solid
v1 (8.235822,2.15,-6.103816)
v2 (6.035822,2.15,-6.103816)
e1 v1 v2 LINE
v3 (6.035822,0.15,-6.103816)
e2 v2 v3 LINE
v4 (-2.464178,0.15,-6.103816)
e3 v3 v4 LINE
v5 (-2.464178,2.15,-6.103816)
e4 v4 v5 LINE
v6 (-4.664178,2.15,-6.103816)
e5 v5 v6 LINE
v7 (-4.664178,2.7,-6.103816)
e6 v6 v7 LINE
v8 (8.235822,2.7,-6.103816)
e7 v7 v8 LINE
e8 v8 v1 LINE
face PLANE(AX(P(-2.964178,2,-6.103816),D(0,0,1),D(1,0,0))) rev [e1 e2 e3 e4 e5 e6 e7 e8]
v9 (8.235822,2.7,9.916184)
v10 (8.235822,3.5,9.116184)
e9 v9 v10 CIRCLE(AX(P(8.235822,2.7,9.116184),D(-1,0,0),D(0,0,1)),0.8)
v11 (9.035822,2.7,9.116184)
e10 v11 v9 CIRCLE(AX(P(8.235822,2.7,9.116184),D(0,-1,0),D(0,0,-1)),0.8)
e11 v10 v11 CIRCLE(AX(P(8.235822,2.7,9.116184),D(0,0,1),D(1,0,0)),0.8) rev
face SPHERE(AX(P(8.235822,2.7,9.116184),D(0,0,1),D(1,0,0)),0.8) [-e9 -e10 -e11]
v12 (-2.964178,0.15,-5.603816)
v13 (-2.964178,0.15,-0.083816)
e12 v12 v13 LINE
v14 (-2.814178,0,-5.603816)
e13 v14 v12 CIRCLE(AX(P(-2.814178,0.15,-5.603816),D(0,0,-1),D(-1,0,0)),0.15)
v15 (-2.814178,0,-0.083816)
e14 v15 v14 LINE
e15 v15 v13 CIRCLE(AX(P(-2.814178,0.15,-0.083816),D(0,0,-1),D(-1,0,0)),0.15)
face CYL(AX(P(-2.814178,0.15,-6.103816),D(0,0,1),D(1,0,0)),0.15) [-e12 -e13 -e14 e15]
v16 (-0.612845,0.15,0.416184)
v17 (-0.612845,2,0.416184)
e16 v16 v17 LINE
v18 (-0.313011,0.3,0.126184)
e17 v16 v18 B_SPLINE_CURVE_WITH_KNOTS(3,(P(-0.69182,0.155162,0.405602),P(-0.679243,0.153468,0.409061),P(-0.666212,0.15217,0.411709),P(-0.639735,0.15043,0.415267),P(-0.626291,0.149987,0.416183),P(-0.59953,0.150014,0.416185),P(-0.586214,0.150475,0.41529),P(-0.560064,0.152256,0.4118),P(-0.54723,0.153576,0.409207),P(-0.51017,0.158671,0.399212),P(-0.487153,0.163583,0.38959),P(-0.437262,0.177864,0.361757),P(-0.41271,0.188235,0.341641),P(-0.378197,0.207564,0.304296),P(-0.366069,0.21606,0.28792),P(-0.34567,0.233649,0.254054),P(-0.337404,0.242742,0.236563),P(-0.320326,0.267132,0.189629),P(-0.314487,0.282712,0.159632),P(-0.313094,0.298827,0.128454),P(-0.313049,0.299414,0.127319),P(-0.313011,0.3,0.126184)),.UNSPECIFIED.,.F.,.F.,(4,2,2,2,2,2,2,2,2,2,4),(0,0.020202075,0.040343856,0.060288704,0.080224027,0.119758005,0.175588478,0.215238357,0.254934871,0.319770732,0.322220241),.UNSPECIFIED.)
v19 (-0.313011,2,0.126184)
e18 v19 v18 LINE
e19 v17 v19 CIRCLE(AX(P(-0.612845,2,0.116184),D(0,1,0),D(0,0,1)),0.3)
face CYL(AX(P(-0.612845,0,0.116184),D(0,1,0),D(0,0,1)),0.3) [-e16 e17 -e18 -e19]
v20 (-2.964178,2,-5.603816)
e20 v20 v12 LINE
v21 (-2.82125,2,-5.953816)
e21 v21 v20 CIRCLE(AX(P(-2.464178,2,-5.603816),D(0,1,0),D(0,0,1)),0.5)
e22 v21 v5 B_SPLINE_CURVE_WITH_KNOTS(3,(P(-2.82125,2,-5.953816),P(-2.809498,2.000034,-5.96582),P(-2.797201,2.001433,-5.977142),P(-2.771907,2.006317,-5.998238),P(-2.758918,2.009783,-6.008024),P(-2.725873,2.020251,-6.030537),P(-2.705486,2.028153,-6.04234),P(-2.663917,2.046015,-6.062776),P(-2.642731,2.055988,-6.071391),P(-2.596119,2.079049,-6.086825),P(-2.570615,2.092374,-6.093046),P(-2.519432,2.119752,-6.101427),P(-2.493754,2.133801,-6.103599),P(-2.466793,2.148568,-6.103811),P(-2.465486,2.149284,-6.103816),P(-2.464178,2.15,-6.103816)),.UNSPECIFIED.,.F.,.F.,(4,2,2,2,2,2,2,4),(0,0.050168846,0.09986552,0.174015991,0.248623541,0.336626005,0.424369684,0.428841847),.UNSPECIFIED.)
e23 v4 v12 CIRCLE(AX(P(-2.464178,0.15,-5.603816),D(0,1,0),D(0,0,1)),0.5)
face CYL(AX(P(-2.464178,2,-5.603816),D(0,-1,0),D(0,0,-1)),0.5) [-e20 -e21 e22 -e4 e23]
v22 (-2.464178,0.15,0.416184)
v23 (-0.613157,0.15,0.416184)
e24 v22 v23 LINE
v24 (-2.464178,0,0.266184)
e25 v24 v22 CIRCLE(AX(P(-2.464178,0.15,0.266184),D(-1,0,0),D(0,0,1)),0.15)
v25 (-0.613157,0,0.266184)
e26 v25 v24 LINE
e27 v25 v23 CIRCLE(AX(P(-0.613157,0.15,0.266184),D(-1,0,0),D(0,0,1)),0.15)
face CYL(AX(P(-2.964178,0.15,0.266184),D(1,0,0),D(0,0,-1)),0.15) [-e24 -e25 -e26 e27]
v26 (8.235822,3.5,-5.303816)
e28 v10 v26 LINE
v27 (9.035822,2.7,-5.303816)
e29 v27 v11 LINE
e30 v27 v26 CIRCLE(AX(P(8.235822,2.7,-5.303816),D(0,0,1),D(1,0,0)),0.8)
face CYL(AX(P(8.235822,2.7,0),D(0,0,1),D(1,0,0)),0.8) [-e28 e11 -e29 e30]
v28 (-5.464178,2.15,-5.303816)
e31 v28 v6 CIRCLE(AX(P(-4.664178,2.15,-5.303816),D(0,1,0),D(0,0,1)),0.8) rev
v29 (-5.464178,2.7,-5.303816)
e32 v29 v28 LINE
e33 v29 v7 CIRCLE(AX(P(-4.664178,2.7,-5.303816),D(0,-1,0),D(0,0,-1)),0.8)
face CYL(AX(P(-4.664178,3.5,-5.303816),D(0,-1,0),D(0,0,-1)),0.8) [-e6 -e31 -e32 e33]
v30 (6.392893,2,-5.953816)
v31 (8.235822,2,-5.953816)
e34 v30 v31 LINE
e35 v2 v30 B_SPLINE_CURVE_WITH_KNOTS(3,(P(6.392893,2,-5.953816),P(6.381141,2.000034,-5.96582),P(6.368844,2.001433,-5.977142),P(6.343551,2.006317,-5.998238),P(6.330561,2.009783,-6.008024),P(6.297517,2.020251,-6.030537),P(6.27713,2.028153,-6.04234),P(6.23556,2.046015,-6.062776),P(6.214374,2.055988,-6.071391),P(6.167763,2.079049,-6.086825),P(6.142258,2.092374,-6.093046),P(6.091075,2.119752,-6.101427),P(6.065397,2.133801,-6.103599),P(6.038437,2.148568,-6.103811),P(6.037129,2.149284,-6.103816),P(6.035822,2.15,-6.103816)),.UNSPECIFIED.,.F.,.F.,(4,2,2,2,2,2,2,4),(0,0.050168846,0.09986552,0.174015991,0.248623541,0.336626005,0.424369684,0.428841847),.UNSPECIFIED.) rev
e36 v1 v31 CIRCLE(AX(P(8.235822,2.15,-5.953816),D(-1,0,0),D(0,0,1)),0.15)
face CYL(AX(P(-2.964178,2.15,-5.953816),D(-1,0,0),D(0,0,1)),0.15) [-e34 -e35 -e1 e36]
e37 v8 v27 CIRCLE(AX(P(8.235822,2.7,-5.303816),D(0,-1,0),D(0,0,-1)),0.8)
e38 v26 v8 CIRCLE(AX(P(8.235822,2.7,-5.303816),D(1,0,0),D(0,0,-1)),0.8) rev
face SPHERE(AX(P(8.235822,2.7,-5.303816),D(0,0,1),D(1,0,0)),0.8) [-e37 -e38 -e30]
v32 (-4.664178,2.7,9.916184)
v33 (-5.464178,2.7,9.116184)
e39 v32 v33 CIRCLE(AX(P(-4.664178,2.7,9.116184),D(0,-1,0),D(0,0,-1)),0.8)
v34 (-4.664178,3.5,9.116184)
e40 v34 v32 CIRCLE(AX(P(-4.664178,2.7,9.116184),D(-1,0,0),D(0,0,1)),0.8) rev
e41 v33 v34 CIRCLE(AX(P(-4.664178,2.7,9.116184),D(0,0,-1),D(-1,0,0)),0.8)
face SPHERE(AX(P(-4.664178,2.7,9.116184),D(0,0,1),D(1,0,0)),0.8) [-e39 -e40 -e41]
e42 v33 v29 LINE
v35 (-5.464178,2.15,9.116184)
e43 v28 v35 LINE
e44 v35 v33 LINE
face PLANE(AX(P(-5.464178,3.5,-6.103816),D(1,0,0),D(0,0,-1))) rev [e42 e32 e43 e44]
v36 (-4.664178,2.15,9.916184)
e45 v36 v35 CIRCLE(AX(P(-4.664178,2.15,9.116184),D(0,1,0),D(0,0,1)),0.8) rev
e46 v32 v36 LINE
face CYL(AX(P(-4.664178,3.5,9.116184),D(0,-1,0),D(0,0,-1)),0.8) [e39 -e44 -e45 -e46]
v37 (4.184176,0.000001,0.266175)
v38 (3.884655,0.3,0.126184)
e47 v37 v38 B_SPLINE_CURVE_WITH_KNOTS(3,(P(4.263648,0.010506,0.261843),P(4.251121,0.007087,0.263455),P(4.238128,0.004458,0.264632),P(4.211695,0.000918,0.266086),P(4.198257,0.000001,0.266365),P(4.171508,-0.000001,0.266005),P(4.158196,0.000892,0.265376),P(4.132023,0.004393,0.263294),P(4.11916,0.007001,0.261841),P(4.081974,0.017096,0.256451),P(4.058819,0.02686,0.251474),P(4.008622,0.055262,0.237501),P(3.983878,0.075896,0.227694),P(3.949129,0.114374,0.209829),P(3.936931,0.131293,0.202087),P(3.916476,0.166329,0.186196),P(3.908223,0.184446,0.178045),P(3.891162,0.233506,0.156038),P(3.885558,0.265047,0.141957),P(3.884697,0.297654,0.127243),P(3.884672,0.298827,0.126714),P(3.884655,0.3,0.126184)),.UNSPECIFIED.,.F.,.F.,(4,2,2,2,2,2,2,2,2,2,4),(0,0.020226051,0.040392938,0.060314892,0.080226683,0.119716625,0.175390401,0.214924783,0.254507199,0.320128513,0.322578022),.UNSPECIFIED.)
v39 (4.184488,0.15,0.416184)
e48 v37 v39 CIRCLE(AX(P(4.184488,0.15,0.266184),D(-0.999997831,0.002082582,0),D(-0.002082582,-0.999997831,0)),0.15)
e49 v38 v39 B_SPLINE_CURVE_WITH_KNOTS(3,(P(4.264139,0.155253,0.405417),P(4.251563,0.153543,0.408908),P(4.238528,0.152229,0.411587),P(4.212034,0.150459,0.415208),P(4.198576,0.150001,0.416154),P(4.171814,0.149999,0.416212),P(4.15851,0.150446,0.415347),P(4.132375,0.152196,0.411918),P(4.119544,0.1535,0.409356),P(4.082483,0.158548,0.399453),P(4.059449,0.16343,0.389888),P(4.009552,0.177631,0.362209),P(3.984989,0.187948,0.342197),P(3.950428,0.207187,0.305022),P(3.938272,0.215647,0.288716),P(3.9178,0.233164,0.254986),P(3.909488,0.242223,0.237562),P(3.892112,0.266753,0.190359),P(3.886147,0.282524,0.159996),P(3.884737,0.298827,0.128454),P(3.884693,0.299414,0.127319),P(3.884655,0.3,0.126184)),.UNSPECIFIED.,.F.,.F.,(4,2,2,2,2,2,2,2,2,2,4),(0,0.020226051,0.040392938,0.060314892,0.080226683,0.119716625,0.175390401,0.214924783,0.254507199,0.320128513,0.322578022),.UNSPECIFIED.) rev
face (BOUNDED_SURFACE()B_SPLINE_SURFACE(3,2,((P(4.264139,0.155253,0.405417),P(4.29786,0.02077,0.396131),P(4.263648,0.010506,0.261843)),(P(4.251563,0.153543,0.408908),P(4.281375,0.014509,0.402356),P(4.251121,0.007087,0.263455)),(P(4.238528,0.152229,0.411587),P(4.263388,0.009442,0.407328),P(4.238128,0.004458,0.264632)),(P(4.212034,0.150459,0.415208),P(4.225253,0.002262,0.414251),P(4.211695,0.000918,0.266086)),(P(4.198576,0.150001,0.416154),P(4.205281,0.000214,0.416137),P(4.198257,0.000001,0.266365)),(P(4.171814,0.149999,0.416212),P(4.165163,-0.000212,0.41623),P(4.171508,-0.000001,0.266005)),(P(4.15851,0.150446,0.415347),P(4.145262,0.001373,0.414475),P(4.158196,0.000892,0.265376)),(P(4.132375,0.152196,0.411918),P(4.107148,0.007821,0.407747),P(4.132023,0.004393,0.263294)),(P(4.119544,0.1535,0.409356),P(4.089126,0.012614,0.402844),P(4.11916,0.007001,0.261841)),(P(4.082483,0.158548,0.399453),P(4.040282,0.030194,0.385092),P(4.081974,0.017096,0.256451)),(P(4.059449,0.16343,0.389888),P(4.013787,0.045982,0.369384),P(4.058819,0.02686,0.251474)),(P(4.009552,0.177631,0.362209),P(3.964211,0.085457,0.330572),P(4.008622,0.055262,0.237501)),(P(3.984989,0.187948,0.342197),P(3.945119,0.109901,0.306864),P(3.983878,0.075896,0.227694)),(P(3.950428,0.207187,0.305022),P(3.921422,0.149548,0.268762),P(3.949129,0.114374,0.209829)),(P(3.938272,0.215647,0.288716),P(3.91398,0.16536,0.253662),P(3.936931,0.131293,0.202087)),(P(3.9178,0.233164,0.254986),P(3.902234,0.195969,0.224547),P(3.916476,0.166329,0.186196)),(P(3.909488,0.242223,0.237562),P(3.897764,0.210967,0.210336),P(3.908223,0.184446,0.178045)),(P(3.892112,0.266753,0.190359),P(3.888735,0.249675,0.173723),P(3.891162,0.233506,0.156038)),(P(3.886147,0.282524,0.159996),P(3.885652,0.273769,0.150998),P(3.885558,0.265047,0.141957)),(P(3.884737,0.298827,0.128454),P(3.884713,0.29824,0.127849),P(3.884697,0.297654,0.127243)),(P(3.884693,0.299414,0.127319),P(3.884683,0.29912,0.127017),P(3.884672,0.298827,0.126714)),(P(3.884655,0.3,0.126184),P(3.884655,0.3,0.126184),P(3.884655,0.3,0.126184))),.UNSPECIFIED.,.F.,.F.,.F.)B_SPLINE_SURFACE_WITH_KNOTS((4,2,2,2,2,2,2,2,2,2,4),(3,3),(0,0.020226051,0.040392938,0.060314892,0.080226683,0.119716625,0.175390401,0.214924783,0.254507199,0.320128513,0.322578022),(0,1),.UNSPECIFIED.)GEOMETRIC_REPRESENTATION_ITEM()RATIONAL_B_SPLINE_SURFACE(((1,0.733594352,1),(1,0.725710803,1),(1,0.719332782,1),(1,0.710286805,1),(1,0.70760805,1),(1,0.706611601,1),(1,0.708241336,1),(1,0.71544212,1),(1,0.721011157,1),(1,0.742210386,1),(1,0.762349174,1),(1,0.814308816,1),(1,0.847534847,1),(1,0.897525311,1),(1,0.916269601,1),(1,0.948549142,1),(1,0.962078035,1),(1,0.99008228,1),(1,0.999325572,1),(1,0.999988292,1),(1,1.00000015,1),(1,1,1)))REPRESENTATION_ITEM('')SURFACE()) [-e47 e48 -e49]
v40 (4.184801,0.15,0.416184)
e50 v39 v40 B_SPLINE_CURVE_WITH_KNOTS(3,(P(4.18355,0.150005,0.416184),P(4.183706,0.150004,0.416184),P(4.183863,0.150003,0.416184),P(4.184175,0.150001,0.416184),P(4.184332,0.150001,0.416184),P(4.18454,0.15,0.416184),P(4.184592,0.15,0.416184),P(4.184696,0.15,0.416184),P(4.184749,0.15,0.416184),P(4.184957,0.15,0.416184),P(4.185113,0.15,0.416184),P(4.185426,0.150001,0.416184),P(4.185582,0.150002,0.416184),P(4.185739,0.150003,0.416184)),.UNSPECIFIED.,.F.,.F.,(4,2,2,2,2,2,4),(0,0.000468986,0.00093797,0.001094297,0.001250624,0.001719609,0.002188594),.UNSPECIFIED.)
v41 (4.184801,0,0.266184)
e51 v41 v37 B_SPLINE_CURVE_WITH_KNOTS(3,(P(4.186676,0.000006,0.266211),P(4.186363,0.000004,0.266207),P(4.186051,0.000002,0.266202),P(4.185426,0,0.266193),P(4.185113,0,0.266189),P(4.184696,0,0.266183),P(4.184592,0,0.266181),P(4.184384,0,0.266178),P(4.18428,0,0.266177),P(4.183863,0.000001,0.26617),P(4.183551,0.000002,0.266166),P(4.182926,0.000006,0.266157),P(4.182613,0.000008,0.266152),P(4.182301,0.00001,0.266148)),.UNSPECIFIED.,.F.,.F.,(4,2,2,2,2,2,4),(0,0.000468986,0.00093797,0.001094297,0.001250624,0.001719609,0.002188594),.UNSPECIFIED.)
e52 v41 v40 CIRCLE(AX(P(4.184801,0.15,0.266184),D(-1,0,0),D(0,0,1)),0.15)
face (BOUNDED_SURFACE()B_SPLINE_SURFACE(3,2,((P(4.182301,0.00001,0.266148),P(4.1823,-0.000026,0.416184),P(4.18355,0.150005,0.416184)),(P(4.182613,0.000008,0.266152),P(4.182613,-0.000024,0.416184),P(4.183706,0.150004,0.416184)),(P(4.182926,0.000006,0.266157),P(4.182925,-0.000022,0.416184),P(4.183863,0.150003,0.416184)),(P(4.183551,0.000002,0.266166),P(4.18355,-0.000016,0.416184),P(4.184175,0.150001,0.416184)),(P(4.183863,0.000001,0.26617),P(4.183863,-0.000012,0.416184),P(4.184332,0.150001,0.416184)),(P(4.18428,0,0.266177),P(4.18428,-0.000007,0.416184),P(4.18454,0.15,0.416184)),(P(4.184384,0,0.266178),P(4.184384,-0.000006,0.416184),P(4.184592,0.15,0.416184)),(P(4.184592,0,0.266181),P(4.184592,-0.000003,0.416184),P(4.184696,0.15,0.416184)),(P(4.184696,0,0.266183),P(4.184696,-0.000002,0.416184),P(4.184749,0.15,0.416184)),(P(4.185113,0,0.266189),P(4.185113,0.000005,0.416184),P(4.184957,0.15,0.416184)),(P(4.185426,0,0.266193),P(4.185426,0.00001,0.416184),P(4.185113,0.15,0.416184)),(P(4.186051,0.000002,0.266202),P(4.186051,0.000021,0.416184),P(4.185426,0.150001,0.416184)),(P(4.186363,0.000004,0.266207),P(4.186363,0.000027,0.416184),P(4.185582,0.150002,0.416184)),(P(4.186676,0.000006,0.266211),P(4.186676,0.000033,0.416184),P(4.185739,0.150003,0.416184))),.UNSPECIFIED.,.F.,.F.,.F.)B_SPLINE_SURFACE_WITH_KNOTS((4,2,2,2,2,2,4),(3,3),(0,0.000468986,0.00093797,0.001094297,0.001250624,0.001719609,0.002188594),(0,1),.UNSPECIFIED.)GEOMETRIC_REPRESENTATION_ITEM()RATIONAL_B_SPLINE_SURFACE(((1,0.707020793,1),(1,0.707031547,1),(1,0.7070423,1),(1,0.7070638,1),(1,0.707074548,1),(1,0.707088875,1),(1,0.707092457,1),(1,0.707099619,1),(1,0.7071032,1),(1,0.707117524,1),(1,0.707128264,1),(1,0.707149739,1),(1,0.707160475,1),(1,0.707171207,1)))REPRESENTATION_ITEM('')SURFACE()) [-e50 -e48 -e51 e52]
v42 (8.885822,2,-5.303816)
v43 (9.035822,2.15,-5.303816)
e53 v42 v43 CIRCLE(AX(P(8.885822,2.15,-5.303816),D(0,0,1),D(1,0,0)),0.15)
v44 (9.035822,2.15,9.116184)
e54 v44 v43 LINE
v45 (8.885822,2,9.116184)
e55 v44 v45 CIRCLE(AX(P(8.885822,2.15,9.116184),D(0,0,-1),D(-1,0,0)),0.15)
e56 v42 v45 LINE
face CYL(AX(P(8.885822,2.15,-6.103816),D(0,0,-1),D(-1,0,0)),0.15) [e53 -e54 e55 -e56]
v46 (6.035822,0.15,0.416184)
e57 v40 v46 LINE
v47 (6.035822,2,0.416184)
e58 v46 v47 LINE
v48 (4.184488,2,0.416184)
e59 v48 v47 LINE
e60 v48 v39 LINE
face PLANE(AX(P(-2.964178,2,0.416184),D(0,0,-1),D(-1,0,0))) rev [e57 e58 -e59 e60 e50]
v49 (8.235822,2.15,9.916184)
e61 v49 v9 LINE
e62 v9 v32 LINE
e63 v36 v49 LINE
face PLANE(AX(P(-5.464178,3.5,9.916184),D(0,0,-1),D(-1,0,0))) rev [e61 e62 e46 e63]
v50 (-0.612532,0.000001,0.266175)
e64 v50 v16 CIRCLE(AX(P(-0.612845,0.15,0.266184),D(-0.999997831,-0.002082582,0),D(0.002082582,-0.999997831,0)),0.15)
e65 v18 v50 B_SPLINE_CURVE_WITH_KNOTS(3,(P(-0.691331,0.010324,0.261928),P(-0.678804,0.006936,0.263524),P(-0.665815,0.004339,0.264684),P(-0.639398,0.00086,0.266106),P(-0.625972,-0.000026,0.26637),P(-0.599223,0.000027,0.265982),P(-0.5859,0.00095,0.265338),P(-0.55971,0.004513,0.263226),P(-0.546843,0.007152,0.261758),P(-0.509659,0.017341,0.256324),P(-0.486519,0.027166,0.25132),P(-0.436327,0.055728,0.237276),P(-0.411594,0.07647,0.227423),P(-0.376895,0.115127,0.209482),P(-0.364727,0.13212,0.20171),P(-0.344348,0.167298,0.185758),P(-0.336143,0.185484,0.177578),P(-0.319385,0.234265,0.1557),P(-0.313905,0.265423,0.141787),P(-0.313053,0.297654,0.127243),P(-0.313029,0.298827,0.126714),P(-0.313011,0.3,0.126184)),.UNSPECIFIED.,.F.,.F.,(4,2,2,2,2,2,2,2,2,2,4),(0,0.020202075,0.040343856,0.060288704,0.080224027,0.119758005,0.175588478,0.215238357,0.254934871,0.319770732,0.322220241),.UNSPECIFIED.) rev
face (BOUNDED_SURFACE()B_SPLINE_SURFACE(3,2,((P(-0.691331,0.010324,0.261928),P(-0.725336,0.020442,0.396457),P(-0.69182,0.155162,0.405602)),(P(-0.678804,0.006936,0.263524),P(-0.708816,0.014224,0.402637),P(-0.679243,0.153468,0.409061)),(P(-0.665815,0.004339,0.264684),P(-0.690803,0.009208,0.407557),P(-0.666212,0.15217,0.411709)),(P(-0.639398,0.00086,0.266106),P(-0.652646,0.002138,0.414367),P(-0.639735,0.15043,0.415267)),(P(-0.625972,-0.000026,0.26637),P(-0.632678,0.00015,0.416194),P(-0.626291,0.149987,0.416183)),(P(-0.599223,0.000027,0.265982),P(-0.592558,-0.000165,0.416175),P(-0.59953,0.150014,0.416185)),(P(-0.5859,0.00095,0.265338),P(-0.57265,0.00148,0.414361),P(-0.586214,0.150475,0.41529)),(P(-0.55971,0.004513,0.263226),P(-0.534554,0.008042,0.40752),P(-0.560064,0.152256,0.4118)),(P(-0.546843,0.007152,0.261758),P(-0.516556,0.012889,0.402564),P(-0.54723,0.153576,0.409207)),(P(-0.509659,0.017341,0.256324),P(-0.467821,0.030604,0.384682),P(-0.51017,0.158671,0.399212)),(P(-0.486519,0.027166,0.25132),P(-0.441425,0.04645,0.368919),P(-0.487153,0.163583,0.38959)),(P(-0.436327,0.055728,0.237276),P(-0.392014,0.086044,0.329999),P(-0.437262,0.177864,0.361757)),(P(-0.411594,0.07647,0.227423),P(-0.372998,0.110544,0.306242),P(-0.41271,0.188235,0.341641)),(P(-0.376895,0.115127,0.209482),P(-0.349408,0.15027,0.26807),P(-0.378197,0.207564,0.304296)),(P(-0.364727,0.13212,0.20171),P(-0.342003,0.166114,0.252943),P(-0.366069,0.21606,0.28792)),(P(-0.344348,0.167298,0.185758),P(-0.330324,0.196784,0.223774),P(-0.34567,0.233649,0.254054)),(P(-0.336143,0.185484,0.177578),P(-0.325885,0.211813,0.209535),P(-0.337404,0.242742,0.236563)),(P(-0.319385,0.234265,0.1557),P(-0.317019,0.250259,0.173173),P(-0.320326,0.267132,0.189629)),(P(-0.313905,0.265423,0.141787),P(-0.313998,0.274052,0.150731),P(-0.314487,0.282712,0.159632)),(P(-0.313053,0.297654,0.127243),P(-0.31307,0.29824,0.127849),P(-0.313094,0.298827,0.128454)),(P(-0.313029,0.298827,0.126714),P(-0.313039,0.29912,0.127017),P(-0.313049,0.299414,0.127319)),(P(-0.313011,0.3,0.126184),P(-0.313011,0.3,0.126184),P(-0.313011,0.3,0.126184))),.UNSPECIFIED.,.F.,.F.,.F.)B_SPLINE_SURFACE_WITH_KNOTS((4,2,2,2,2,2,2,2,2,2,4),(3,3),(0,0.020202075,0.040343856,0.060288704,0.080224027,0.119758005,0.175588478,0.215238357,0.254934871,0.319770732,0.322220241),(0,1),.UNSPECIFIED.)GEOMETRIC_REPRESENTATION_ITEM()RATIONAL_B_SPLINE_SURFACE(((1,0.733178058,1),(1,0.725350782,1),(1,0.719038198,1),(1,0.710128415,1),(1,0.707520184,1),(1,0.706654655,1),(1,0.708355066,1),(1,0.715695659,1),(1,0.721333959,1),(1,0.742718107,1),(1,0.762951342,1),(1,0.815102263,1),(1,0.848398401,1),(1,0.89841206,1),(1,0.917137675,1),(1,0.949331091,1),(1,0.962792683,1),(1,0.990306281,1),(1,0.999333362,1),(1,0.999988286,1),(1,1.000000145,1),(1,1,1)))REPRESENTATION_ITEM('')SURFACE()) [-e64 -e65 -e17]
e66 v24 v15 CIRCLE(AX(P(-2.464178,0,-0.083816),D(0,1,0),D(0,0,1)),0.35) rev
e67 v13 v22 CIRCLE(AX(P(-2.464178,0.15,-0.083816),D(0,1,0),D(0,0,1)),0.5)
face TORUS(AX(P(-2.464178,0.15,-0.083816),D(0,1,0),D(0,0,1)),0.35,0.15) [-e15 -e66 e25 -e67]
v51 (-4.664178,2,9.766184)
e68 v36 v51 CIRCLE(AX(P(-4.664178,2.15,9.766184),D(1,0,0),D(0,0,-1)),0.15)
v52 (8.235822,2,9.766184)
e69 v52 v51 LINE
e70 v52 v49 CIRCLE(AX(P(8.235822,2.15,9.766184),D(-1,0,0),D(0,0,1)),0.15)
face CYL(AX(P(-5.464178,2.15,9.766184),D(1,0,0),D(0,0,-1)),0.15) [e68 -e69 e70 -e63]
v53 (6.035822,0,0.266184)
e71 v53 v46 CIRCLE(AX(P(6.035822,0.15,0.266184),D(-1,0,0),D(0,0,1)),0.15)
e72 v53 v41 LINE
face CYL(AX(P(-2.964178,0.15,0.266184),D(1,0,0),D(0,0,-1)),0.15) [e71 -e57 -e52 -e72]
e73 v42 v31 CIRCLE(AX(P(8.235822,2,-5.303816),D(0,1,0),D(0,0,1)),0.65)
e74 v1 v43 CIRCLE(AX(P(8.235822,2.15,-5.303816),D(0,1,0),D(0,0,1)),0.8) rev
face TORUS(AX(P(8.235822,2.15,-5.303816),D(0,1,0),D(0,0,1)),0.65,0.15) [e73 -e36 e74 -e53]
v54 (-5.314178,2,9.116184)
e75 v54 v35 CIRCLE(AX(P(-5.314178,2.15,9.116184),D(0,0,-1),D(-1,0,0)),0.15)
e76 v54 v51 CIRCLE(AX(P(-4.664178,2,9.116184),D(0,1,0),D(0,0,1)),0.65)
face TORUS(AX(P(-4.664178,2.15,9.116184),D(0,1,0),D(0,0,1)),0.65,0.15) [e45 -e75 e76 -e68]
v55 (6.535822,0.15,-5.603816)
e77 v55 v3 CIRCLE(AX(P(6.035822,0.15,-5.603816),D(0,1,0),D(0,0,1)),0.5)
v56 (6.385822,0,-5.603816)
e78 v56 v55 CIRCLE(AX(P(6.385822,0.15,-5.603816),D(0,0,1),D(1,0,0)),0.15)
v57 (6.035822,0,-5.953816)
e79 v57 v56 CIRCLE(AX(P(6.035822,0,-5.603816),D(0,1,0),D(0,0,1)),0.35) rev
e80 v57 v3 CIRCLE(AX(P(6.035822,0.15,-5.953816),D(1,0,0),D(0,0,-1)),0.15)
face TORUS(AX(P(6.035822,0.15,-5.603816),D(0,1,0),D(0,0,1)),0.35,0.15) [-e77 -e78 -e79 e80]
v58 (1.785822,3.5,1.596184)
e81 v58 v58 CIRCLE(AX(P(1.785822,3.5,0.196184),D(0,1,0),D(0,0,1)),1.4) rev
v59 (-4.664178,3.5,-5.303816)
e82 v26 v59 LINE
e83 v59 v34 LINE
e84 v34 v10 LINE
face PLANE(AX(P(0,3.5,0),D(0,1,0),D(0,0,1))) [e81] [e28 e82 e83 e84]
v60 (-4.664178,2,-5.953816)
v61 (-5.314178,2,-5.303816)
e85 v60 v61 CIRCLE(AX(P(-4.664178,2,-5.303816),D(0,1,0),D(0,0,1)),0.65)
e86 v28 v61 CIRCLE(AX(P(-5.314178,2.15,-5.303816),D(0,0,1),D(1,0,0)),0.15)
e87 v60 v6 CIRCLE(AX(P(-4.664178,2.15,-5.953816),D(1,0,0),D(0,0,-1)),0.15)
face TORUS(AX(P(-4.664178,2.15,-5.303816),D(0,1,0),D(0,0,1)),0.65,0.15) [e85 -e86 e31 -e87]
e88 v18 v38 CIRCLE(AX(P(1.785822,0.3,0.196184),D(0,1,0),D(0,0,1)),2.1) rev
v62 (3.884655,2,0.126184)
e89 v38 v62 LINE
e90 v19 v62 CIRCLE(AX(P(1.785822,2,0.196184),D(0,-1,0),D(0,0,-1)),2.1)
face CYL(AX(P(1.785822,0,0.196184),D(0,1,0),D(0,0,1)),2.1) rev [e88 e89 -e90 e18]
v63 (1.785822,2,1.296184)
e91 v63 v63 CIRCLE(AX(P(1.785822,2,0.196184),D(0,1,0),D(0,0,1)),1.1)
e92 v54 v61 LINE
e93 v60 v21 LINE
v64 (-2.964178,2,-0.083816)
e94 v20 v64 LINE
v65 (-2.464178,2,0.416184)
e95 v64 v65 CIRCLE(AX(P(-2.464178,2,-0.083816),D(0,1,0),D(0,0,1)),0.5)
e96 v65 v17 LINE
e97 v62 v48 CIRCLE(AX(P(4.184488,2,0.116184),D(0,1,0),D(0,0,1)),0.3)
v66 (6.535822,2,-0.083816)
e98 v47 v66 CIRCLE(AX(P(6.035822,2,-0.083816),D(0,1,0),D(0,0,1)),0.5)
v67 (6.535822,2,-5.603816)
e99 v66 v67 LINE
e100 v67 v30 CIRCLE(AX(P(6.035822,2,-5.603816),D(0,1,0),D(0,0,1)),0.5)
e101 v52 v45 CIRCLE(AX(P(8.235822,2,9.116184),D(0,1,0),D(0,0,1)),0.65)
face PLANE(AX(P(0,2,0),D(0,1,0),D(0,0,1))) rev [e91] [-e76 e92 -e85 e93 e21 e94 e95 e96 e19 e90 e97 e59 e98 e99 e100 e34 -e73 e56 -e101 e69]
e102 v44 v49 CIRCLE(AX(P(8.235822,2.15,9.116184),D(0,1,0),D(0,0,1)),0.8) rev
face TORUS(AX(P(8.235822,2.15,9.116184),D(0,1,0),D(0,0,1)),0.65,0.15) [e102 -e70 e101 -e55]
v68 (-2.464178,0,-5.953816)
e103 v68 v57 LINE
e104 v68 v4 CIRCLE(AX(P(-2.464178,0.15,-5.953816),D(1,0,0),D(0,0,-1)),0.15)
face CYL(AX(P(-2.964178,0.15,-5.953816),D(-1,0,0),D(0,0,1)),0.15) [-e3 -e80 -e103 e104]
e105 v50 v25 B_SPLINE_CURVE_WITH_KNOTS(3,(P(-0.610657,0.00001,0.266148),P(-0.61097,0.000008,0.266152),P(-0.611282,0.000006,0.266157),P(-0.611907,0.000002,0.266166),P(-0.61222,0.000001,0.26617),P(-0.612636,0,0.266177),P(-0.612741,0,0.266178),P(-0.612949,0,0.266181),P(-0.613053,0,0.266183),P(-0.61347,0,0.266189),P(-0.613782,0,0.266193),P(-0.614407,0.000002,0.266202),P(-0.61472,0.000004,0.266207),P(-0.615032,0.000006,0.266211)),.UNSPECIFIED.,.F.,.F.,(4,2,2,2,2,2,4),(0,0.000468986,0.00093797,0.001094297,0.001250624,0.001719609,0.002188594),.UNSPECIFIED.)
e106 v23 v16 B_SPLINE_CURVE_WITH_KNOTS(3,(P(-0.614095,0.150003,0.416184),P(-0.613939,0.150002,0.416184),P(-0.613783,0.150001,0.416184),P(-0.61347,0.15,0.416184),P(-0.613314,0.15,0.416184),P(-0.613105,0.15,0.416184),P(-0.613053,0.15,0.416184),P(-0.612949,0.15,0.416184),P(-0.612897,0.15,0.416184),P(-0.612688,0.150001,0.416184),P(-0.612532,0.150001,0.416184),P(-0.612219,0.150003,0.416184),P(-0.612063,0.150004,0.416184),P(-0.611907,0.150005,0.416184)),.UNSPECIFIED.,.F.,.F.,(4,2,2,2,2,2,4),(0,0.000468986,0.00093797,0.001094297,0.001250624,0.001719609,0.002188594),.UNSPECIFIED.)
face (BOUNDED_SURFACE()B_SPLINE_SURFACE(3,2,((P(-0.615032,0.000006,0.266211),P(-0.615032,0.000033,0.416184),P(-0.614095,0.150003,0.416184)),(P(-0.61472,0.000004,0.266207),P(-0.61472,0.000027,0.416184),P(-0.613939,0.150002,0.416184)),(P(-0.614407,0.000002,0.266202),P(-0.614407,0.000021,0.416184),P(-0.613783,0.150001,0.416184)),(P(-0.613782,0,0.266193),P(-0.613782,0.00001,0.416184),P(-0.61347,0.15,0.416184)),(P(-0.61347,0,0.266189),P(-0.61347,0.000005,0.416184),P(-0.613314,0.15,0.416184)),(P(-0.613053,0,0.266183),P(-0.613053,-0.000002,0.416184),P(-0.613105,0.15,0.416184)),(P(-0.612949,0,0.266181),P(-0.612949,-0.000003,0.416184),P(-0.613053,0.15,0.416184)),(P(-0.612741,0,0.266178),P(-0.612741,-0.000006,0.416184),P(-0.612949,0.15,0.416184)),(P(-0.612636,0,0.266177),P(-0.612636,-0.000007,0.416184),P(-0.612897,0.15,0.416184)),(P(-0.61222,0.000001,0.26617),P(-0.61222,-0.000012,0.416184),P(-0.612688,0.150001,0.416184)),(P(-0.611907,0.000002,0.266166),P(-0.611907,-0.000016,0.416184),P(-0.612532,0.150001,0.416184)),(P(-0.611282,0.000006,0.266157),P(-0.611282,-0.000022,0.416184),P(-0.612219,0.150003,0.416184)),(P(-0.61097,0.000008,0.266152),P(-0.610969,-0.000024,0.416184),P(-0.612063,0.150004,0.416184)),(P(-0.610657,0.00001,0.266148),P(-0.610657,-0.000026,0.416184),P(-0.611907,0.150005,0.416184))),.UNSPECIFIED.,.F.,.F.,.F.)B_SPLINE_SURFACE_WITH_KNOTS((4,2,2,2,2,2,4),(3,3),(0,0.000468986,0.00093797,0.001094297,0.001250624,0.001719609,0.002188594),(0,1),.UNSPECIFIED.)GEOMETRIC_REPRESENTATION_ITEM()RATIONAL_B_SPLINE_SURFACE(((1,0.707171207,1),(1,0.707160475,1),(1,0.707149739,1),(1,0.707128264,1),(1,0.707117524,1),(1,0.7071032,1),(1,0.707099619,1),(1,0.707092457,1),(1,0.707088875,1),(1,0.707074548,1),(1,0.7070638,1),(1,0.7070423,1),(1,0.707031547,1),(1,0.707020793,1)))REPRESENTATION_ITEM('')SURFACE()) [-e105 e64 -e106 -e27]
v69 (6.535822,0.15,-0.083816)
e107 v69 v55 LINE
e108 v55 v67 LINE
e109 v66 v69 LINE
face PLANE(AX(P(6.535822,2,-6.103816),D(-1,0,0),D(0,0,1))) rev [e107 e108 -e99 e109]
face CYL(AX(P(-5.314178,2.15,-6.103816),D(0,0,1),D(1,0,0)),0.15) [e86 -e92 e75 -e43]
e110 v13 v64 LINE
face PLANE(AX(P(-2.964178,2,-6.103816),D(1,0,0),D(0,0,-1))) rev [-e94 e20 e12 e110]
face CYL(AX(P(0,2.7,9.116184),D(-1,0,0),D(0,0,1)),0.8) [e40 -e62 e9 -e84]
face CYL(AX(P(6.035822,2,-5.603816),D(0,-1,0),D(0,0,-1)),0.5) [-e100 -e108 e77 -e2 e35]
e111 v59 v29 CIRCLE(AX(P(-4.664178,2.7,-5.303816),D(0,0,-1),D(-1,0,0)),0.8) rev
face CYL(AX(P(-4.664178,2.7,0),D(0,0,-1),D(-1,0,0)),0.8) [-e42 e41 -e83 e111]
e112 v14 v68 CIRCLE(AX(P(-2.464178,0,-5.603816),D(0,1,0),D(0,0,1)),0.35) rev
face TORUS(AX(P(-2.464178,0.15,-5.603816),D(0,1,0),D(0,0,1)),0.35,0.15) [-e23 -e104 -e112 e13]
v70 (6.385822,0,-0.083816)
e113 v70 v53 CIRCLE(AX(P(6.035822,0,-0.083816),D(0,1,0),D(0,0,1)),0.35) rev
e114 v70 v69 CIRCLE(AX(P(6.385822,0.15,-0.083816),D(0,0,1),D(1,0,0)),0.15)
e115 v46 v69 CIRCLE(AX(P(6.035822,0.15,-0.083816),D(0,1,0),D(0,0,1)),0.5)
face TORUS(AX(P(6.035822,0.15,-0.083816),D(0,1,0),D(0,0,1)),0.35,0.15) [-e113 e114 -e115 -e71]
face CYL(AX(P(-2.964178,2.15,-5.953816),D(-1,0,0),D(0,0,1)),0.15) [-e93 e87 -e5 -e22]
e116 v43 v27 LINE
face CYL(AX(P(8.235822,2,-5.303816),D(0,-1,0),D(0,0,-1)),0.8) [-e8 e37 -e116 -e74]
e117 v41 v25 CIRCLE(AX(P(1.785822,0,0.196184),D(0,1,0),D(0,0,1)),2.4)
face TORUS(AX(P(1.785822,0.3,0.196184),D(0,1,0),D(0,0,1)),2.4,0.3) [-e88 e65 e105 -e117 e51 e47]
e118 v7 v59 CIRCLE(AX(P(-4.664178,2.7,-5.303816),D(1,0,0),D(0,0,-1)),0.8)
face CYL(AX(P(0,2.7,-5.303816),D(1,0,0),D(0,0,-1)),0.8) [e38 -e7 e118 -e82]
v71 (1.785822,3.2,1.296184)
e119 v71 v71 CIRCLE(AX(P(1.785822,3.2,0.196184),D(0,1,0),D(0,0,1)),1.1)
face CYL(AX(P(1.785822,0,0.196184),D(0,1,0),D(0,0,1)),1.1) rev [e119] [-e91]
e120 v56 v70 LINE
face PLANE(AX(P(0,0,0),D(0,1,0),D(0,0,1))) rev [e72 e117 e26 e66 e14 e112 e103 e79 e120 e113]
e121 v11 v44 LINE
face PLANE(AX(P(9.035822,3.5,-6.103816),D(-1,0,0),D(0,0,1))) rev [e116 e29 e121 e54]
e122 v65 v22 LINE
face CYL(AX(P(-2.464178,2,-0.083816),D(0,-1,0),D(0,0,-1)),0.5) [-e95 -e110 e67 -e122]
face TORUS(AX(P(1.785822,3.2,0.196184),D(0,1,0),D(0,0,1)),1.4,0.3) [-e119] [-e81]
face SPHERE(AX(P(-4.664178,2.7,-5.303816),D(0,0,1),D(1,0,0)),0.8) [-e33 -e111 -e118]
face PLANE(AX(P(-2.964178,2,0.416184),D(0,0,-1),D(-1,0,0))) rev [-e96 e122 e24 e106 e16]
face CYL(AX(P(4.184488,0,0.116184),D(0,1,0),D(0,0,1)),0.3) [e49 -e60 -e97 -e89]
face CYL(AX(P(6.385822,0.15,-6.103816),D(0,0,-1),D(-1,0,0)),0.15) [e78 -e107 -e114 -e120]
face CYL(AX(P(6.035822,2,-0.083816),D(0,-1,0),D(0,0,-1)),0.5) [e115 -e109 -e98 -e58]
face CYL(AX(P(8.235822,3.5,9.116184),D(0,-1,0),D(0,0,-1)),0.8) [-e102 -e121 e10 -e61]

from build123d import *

# Parameters (mm, degrees)
SKETCH_1_W          = 9.5
SKETCH_1_H          = 6.52
EXTRUDE_1_DEPTH     = 2
SKETCH_2_W          = 14.5
SKETCH_2_H          = 16.02
EXTRUDE_2_DEPTH     = 1.5
SKETCH_3_R          = 1.1
CUT_EXTRUDE_1_DEPTH = 14.864587318
FILLET_3_R          = 0.8
FILLET_4_R          = 0.5
FILLET_7_R          = 0.15
FILLET_8_R          = 0.8
FILLET_10_R         = 0.3
SKETCH_4_R          = 2.1
CUT_EXTRUDE_2_DEPTH = 14.563804108
FILLET_11_R         = 0.3
FILLET_12_R         = 0.15


with BuildPart() as part:
    # Эскиз1 → Бобышка-Вытянуть1 (new body)
    with BuildSketch(Plane(origin=(0, 0, 0), x_dir=(1, 0, 0), z_dir=(0, 1, 0))):
        with Locations((1.785821709, 2.843815878)):
            Rectangle(SKETCH_1_W, SKETCH_1_H)
    extrude(amount=EXTRUDE_1_DEPTH)

    # Эскиз2 → Бобышка-Вытянуть2 (add)
    with BuildSketch(Plane(origin=(0, 2, 0), x_dir=(1, 0, 0), z_dir=(0, 1, 0))):
        with Locations((1.785821709, -1.906184122)):
            Rectangle(SKETCH_2_W, SKETCH_2_H)
    extrude(amount=EXTRUDE_2_DEPTH)

    # Эскиз3 → Вырез-Вытянуть1 (cut, through all)
    with BuildSketch(Plane(origin=(0, 3.5, 0), x_dir=(1, 0, 0), z_dir=(0, 1, 0))):
        with Locations(Location((1.785821709, -0.196184122, 0), (0, 0, 270))):
            Circle(SKETCH_3_R)
    extrude(amount=-CUT_EXTRUDE_1_DEPTH, mode=Mode.SUBTRACT)

    # Скругление3
    fillet_3_edges = [part.edges().sort_by_distance(p)[0] for p in [
        (-5.464178291, 3.5, 1.906184122),
        (1.785821709, 3.5, 9.916184122),
        (9.035821709, 3.5, 1.906184122),
        (1.785821709, 3.5, -6.103815878),
    ]]
    fillet(fillet_3_edges, radius=FILLET_3_R)

    # Скругление4
    fillet_4_edges = [part.edges().sort_by_distance(p)[0] for p in [
        (-2.964178291, 1, -6.103815878),
        (6.535821709, 1, -6.103815878),
        (6.535821709, 1, 0.416184122),
        (-2.964178291, 1, 0.416184122),
    ]]
    fillet(fillet_4_edges, radius=FILLET_4_R)

    # Скругление7
    fillet_7_edges = [part.edges().sort_by_distance(p)[0] for p in [
        (-5.464178291, 2, 1.906184122),
        (1.785821709, 2, 9.916184122),
        (9.035821709, 2, 1.906184122),
        (7.535821709, 2, -6.103815878),
        (-3.964178291, 2, -6.103815878),
    ]]
    fillet(fillet_7_edges, radius=FILLET_7_R)

    # Скругление8
    # the kernel refuses this fillet: 0.8 mm, written as the material it takes off along each edge
    with BuildSketch(Plane(origin=(-4.664178291, 2, -5.303815878), x_dir=(-1, 0, 0), z_dir=(0, 0, 1))) as fillet_8_piece_1:
        with BuildLine():
            CenterArc((0.65, -0.15), 0.15, 0, 90)
            Line((0.8, -0.15), (0.8, 0))
            Line((0.8, 0), (0.65, 0))
        make_face()
    revolve(axis=Axis((-4.664178291, 2, -5.303815878), (0, -1, 0)), revolution_arc=90, mode=Mode.SUBTRACT)
    with BuildSketch(Plane(origin=(-4.664178291, 2, 9.116184122), x_dir=(0, 0, 1), z_dir=(1, 0, 0))) as fillet_8_piece_2:
        with BuildLine():
            CenterArc((0.65, -0.15), 0.15, 0, 90)
            Line((0.8, -0.15), (0.8, 0))
            Line((0.8, 0), (0.65, 0))
        make_face()
    revolve(axis=Axis((-4.664178291, 2, 9.116184122), (0, -1, 0)), revolution_arc=90, mode=Mode.SUBTRACT)
    with BuildSketch(Plane(origin=(8.235821709, 2, 9.116184122), x_dir=(1, 0, 0), z_dir=(0, 0, -1))) as fillet_8_piece_3:
        with BuildLine():
            CenterArc((0.65, -0.15), 0.15, 0, 90)
            Line((0.8, -0.15), (0.8, 0))
            Line((0.8, 0), (0.65, 0))
        make_face()
    revolve(axis=Axis((8.235821709, 2, 9.116184122), (0, -1, 0)), revolution_arc=90, mode=Mode.SUBTRACT)
    with BuildSketch(Plane(origin=(8.235821709, 2, -5.303815878), x_dir=(0, 0, -1), z_dir=(-1, 0, 0))) as fillet_8_piece_4:
        with BuildLine():
            CenterArc((0.65, -0.15), 0.15, 0, 90)
            Line((0.8, -0.15), (0.8, 0))
            Line((0.8, 0), (0.65, 0))
        make_face()
    revolve(axis=Axis((8.235821709, 2, -5.303815878), (0, -1, 0)), revolution_arc=90, mode=Mode.SUBTRACT)
    with BuildSketch(Plane(origin=(8.235821709, 2.7, 9.116184122), x_dir=(1, 0, 0), z_dir=(0, 0, 1))) as fillet_8_piece_5_section:
        Polygon((0, 0), (FILLET_8_R, 0), (FILLET_8_R, FILLET_8_R), (0, FILLET_8_R), align=None)
    fillet_8_piece_5 = extrude(amount=FILLET_8_R, mode=Mode.PRIVATE)
    fillet_8_piece_5 = fillet_8_piece_5 - Plane(origin=(8.235821709, 2.7, 9.116184122), x_dir=(-0.7071067811865475, -0.7071067811865475, 0), z_dir=(0, 0, 1)) * Sphere(FILLET_8_R, mode=Mode.PRIVATE)
    add(fillet_8_piece_5, mode=Mode.SUBTRACT)
    with BuildSketch(Plane(origin=(-4.664178291, 2.7, 9.116184122), x_dir=(-1, 0, 0), z_dir=(0, 0, 1))) as fillet_8_piece_6_section:
        Polygon((0, 0), (FILLET_8_R, 0), (FILLET_8_R, -FILLET_8_R), (0, -FILLET_8_R), align=None)
    fillet_8_piece_6 = extrude(amount=FILLET_8_R, mode=Mode.PRIVATE)
    fillet_8_piece_6 = fillet_8_piece_6 - Plane(origin=(-4.664178291, 2.7, 9.116184122), x_dir=(0.7071067811865475, -0.7071067811865475, 0), z_dir=(0, 0, 1)) * Sphere(FILLET_8_R, mode=Mode.PRIVATE)
    add(fillet_8_piece_6, mode=Mode.SUBTRACT)
    with BuildSketch(Plane(origin=(8.235821709, 2.7, -5.303815878), x_dir=(1, 0, 0), z_dir=(0, 0, -1))) as fillet_8_piece_7_section:
        Polygon((0, 0), (FILLET_8_R, 0), (FILLET_8_R, -FILLET_8_R), (0, -FILLET_8_R), align=None)
    fillet_8_piece_7 = extrude(amount=FILLET_8_R, mode=Mode.PRIVATE)
    fillet_8_piece_7 = fillet_8_piece_7 - Plane(origin=(8.235821709, 2.7, -5.303815878), x_dir=(-0.7071067811865475, -0.7071067811865475, 0), z_dir=(0, 0, -1)) * Sphere(FILLET_8_R, mode=Mode.PRIVATE)
    add(fillet_8_piece_7, mode=Mode.SUBTRACT)
    with BuildSketch(Plane(origin=(-4.664178291, 2.7, -5.303815878), x_dir=(-1, 0, 0), z_dir=(0, 0, -1))) as fillet_8_piece_8_section:
        Polygon((0, 0), (FILLET_8_R, 0), (FILLET_8_R, FILLET_8_R), (0, FILLET_8_R), align=None)
    fillet_8_piece_8 = extrude(amount=FILLET_8_R, mode=Mode.PRIVATE)
    fillet_8_piece_8 = fillet_8_piece_8 - Plane(origin=(-4.664178291, 2.7, -5.303815878), x_dir=(0.7071067811865475, -0.7071067811865475, 0), z_dir=(0, 0, -1)) * Sphere(FILLET_8_R, mode=Mode.PRIVATE)
    add(fillet_8_piece_8, mode=Mode.SUBTRACT)
    with BuildSketch(Plane(origin=(-5.464178291, 2, -6.103815878), x_dir=(1, 0, 0), z_dir=(0, 1, 0)), Plane(origin=(9.035821709, 2, 9.916184122), x_dir=(-1, 0, 0), z_dir=(0, 1, 0))) as fillet_8_piece_9:
        with BuildLine():
            CenterArc((FILLET_8_R, -FILLET_8_R), FILLET_8_R, 90, 90)
            Line((0, -FILLET_8_R), (0, 0))
            Line((0, 0), (FILLET_8_R, 0))
        make_face()
    extrude(amount=0.7, mode=Mode.SUBTRACT)
    with BuildSketch(Plane(origin=(9.035821709, 2, -6.103815878), x_dir=(-1, 0, 0), z_dir=(0, 1, 0)), Plane(origin=(-5.464178291, 2, 9.916184122), x_dir=(1, 0, 0), z_dir=(0, 1, 0))) as fillet_8_piece_10:
        with BuildLine():
            CenterArc((FILLET_8_R, FILLET_8_R), FILLET_8_R, 180, 90)
            Line((0, FILLET_8_R), (0, 0))
            Line((0, 0), (FILLET_8_R, 0))
        make_face()
    extrude(amount=0.7, mode=Mode.SUBTRACT)

    # Скругление10
    fillet_10_edges = [part.edges().sort_by_distance(p)[0] for p in [
        (1.785821709, 3.5, -0.903815878),
    ]]
    fillet(fillet_10_edges, radius=FILLET_10_R)

    # Эскиз4 → Вырез-Вытянуть2 (cut, through all)
    with BuildSketch(Plane.XZ.offset(-2)):
        with Locations((1.785821709, 0.196184122)):
            Circle(SKETCH_4_R)
    extrude(amount=CUT_EXTRUDE_2_DEPTH, mode=Mode.SUBTRACT)

    # Скругление11
    fillet_11_edges = [part.edges().sort_by_distance(p)[0] for p in [
        (1.785821709, 0, -1.903815878),
        (-0.302622688, 1, 0.416184122),
        (3.874266106, 1, 0.416184122),
    ]]
    fillet(fillet_11_edges, radius=FILLET_11_R)

    # Скругление12
    fillet_12_edges = [part.edges().sort_by_distance(p)[0] for p in [
        (5.110154857, 0, 0.416184122),
        (-0.608464555, 0, 0.416152145),
        (4.180107973, 0, 0.416152145),
        (-0.383168508, 0.105102909, 0.309183864),
        (3.954811922, 0.10510291, 0.309183857),
        (-1.538511439, 0, 0.416184122),
        (-2.964178291, 0, -2.843815878),
        (1.785821709, 0, -6.103815878),
        (6.535821709, 0, -2.843815878),
        (-2.817731681, 0, -5.957369269),
        (6.3893751, 0, -5.957369269),
        (6.3893751, 0, 0.269737512),
        (-2.817731681, 0, 0.269737512),
    ]]
    fillet(fillet_12_edges, radius=FILLET_12_R)


solid = part.part
